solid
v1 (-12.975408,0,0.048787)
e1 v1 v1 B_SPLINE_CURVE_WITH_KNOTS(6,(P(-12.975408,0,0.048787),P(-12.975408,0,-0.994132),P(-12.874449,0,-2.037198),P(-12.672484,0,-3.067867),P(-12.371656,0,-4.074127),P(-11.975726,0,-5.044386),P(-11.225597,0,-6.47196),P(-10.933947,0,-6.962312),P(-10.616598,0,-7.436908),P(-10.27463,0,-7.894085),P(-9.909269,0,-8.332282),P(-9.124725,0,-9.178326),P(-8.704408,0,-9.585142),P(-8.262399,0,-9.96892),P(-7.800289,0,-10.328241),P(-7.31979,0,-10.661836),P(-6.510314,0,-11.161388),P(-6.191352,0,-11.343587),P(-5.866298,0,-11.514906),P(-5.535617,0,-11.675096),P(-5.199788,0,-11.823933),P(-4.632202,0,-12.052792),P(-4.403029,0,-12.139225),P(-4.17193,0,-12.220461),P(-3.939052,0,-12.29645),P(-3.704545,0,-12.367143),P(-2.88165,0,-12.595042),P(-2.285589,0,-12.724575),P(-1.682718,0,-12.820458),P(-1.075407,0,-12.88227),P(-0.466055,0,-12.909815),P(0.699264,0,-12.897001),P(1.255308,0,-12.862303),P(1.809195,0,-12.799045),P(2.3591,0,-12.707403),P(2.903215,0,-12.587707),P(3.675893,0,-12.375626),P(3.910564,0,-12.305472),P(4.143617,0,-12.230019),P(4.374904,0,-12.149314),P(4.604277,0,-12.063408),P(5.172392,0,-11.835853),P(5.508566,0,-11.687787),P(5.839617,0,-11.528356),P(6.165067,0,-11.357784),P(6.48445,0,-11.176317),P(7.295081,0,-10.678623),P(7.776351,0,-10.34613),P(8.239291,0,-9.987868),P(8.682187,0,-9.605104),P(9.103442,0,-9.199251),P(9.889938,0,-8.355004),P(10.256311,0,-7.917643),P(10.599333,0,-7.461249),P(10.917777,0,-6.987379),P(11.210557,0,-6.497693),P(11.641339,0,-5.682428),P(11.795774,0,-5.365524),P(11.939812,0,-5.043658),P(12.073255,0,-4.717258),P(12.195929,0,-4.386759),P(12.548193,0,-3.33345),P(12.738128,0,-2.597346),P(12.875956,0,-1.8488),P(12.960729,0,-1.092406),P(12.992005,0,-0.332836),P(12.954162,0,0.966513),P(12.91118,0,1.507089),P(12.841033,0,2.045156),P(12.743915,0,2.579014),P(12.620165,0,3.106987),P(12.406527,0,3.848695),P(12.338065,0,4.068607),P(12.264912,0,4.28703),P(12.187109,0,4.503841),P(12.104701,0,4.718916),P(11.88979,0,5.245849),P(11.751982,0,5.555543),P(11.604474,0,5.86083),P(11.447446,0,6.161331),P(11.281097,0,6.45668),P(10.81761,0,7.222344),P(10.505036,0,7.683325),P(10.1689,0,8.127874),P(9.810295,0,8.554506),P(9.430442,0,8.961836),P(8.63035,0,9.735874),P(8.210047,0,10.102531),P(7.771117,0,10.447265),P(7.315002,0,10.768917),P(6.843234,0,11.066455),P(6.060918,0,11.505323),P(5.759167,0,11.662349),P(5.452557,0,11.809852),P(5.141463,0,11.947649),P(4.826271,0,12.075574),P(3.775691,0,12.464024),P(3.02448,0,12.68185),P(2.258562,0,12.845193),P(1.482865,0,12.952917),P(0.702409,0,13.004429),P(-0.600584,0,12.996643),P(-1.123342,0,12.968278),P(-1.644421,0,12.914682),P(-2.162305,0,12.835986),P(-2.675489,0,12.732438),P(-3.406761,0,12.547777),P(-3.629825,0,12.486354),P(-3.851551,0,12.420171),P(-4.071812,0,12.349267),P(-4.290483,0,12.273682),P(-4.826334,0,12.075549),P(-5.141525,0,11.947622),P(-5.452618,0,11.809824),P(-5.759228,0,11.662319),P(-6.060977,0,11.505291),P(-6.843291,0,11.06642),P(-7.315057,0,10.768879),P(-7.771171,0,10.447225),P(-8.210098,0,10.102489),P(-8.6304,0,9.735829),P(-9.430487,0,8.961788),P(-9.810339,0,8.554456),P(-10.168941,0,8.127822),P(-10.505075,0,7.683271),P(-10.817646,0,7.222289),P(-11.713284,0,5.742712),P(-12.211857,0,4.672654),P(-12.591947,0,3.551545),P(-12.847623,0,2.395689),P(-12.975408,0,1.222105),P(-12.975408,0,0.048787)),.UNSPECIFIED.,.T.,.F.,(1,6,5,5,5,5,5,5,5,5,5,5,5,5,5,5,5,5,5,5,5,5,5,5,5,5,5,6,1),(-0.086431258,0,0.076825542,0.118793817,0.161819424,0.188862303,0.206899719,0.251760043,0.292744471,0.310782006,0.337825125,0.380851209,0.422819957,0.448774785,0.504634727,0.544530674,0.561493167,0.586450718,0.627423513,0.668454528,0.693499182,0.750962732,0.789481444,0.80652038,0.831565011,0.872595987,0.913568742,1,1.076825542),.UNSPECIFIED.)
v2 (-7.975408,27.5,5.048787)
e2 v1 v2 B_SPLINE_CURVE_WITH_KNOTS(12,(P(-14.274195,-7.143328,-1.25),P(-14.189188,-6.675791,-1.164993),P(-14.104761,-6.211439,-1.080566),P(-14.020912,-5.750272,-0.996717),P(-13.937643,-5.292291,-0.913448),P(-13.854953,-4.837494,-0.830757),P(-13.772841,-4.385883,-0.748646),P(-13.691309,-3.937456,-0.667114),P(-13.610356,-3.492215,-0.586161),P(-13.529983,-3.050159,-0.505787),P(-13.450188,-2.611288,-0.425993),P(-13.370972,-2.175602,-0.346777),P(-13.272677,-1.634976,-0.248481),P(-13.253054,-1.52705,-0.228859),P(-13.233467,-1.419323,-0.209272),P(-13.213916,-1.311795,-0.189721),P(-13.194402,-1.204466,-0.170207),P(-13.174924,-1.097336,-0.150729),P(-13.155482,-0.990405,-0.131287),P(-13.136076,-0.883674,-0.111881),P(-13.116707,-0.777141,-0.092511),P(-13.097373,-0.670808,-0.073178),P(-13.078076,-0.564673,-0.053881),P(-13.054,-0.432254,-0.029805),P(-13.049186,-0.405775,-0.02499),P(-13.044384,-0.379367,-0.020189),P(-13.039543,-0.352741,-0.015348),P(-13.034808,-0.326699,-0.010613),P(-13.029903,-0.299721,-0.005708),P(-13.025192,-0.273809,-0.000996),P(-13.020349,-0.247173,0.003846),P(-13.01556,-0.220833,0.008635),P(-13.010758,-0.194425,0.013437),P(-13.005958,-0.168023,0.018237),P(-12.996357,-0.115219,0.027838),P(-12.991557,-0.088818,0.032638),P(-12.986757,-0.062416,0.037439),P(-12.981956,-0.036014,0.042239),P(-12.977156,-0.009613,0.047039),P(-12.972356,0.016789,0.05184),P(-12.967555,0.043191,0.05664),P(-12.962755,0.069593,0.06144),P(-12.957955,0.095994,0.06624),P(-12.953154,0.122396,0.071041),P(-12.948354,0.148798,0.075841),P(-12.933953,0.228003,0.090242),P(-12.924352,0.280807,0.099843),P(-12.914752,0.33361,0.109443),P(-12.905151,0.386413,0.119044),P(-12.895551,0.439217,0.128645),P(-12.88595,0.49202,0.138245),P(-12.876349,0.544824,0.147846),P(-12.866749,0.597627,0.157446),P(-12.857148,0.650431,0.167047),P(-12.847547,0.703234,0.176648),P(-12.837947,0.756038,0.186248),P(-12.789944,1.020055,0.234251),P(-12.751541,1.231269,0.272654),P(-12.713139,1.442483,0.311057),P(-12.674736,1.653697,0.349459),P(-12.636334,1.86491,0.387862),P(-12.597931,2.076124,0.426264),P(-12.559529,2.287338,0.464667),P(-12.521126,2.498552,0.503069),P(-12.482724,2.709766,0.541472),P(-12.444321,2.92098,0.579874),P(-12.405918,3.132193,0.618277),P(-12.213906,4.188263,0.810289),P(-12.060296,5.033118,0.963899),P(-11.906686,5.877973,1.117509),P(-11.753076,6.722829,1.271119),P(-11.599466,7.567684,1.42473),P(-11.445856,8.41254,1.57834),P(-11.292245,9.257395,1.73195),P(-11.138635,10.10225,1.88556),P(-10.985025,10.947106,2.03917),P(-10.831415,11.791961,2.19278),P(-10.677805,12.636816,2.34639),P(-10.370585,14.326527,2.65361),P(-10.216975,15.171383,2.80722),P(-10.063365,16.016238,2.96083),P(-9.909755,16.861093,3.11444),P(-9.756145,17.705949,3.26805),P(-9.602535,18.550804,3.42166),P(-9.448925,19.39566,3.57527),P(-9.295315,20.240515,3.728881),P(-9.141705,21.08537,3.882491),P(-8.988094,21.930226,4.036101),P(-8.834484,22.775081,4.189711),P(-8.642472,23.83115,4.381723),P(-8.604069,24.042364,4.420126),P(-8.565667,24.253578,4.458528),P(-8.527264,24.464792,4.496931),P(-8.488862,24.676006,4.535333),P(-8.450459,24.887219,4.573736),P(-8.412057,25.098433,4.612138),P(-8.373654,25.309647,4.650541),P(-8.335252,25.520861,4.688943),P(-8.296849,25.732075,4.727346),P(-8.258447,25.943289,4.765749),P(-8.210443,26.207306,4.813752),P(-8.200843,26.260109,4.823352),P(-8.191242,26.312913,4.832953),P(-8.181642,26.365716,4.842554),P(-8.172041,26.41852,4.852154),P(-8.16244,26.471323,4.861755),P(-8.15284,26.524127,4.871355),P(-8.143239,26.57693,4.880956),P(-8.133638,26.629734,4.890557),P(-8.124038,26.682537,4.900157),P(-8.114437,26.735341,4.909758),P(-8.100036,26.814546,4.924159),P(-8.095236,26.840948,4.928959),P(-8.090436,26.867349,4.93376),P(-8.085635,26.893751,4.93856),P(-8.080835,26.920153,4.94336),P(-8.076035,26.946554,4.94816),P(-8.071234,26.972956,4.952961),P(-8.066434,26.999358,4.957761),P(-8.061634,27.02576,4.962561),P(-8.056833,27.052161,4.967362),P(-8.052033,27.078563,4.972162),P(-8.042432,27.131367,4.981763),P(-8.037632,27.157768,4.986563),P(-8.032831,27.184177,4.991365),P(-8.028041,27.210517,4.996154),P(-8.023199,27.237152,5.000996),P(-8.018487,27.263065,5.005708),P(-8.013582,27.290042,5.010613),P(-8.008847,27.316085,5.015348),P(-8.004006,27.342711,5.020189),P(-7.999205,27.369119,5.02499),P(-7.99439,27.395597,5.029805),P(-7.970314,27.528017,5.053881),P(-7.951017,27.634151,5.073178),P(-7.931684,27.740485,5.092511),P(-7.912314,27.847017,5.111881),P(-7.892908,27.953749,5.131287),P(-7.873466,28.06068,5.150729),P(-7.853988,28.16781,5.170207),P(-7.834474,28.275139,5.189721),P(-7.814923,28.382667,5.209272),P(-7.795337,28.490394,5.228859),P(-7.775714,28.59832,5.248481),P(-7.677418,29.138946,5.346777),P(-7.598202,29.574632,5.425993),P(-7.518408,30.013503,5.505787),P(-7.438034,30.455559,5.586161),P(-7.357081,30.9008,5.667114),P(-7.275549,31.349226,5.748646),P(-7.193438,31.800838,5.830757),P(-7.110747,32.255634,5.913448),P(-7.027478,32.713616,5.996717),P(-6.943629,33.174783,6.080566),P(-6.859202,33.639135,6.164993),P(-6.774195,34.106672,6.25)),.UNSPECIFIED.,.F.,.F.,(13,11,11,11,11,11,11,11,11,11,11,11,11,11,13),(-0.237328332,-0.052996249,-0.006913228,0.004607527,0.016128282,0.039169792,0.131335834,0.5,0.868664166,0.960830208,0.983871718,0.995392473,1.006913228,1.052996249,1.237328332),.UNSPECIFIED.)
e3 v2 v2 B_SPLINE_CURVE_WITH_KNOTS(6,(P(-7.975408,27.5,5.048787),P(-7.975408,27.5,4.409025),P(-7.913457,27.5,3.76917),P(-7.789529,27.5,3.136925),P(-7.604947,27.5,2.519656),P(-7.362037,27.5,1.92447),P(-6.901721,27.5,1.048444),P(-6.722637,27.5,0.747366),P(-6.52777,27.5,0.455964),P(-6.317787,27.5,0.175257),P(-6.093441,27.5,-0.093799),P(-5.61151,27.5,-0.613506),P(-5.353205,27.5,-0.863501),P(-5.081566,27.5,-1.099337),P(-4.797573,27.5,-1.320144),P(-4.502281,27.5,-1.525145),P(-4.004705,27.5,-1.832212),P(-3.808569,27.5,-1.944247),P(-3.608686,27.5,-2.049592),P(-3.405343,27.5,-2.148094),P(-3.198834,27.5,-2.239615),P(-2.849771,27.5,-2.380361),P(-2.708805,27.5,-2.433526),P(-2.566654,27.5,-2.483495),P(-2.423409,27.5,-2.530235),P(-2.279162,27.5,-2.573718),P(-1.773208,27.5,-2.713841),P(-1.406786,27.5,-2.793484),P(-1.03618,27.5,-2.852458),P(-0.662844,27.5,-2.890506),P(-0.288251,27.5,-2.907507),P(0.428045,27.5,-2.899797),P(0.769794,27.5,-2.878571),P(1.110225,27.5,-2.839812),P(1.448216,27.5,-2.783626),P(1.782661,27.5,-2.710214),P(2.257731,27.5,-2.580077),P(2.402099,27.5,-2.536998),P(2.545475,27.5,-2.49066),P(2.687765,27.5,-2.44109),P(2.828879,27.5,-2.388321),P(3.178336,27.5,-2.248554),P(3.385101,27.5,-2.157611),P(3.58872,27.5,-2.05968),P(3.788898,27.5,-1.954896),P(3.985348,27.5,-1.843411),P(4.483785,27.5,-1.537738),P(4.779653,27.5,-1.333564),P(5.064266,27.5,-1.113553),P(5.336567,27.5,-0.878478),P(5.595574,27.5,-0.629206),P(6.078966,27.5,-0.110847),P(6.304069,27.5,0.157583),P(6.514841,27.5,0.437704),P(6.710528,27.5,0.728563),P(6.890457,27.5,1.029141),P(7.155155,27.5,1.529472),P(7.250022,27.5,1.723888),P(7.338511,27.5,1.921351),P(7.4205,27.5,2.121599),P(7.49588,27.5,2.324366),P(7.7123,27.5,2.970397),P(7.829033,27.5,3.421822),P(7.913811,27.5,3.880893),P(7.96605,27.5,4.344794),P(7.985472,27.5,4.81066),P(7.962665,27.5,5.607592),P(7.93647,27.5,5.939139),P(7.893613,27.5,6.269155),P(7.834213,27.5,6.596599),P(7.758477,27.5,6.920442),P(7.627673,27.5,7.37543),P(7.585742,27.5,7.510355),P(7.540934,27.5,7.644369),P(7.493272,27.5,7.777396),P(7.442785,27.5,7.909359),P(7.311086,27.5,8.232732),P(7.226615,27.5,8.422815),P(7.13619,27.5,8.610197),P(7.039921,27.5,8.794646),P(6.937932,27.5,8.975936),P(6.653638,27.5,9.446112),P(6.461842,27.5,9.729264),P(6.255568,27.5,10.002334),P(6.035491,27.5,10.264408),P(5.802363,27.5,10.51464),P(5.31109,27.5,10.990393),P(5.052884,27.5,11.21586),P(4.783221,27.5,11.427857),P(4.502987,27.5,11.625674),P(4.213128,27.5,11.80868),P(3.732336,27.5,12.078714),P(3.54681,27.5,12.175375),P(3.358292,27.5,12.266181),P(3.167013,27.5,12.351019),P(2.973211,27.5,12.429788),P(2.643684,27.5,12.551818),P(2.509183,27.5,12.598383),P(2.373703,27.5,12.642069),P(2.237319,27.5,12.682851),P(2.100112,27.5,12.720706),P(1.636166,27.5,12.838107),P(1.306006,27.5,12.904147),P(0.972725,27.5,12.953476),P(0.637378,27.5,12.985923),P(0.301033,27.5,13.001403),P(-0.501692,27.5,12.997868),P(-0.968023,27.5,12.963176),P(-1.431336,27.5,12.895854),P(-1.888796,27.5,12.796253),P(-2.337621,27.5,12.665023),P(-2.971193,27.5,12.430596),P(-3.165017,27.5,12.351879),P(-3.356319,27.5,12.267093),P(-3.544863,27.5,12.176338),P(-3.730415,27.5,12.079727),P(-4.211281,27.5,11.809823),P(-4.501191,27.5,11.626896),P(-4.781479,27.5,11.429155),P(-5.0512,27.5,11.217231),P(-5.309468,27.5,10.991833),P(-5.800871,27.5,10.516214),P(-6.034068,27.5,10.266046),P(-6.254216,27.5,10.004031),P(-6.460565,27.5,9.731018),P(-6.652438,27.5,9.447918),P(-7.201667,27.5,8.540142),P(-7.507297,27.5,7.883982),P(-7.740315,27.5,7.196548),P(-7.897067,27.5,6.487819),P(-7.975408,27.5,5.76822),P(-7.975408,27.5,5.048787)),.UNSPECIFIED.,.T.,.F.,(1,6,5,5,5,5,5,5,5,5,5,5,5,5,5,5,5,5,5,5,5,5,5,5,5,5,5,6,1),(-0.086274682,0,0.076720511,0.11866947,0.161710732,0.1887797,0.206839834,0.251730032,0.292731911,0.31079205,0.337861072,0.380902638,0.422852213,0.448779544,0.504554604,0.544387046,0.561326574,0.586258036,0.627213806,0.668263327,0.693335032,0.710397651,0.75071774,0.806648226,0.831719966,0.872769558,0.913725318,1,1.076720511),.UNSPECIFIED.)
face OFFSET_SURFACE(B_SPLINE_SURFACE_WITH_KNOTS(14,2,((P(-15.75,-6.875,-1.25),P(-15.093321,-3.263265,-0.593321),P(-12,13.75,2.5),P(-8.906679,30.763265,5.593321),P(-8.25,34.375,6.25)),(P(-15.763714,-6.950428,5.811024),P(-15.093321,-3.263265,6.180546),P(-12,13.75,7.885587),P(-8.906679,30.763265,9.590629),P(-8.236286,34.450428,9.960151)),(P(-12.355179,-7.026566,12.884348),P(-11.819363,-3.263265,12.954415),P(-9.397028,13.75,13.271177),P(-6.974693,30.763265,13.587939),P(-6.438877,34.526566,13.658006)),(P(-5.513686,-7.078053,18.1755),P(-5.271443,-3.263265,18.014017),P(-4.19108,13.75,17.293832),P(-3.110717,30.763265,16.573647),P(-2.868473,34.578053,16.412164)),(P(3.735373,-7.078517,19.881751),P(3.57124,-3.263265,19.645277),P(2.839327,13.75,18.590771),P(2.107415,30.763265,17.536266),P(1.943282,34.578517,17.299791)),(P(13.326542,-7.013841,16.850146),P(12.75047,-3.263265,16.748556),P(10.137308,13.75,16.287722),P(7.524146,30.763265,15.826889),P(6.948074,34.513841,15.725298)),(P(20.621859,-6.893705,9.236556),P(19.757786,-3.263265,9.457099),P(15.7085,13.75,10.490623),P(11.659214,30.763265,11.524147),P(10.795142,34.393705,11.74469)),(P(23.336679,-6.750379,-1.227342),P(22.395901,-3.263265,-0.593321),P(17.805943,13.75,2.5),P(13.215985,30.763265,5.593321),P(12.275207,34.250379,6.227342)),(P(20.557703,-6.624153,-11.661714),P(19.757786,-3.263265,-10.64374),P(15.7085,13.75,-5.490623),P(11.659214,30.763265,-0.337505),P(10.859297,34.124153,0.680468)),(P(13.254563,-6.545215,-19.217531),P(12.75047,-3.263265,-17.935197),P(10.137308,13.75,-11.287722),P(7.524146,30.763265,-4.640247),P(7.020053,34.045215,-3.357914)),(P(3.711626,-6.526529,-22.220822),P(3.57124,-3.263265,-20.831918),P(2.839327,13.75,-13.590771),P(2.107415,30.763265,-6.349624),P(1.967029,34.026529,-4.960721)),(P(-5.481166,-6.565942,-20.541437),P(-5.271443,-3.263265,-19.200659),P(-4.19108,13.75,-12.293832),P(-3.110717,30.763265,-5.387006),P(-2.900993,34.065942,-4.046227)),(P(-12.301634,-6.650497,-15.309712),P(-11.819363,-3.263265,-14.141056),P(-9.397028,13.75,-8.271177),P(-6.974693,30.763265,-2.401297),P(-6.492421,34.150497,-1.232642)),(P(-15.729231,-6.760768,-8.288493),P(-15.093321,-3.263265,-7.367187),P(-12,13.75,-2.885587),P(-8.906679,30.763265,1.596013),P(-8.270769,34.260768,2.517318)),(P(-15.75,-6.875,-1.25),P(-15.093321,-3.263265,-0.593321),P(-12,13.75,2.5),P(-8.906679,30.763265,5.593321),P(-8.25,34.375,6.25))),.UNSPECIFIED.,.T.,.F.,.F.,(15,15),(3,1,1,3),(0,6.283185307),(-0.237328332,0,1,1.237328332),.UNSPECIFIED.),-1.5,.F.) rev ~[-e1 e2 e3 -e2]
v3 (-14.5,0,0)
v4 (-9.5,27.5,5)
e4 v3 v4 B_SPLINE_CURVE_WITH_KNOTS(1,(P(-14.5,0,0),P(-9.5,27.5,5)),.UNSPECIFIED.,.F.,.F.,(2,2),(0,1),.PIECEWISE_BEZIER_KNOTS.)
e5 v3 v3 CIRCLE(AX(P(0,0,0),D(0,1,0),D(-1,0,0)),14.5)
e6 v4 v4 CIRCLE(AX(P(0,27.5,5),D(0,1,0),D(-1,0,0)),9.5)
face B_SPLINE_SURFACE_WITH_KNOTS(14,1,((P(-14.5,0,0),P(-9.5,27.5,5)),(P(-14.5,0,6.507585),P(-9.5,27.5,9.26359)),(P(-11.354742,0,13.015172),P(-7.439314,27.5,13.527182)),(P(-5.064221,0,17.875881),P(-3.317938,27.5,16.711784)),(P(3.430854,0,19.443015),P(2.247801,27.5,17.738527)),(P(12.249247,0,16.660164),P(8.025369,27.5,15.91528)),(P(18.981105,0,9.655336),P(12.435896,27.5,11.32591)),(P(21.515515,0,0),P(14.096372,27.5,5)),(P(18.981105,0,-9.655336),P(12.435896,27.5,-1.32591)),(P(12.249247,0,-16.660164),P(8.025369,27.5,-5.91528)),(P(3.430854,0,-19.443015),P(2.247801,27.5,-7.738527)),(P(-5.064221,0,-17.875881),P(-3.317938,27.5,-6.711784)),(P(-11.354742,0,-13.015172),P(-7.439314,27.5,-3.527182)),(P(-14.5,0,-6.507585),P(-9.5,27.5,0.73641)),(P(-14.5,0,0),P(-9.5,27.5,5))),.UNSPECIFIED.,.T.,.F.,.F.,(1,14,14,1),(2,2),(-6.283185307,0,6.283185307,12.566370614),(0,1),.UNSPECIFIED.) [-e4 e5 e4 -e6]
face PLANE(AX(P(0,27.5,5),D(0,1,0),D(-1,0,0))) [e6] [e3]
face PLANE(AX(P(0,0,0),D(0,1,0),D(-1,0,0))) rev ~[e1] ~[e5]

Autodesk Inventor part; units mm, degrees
ref_plane "YZ Plane" through (0, 0, 0) normal (1, 0, 0) x (0, 1, 0)
ref_plane "XY Plane" through (0, 0, 0) normal (0, 0, 1) x (1, 0, 0)
sketch "Szkic6" plane through (0, 0, 0) normal (0, 1, 0) x (-1, 0, 0)
  circle A0 centre (0, 0) radius 14.5
  dimension "d33" = 29
ref_plane "Płaszczyzna konstrukcyjna1" through (0, 27.5, 0) normal (0, 1, 0) x (-1, 0, 0)
sketch "Szkic7" plane through (0, 27.5, 0) normal (0, 1, 0) x (-1, 0, 0)
  circle A0 centre (0, 5) radius 9.5
  line L0 (0, -20.3) -> (0, 20.3) construction
  circle A1 centre (0, 0) radius 14.5 construction
  dimension "d35" = 19
loft "Wyciągnięcie złożone1" add profiles "Szkic6", "Szkic7"
shell "Skorupa1" thickness 1.5 removed faces 2 at (-2.3703, 27.5, 2.9001) at (1.052, 0, -3.5603)
equation "\"d33\" = OD1"
equation "\"d35\" = OD2"
equation "\"d52\" = THK"
equation "\"SzerokośćGięciaPodcięcia\" = Grubość"
equation "\"RozmiarPodcięciaNarożnika\" = 4 * Grubość"
equation "\"PromieńPrzejścia\" = PromieńGięcia"
equation "\"Rozmiar_promienia_Jacobiego\" = PromieńGięcia"
equation "\"Wielk_odstępu\" = Grubość"
equation "\"d2\" = PromieńGięcia"
equation "\"d23\" = PromieńGięcia"
equation "\"OD1\" = 29"
equation "\"OD2\" = 19"
equation "\"L\" = 27.5"
equation "\"THK\" = 1.5"
equation "\"d34\" = L"
equation "\"Grubość\" = 1.5"
equation "\"PromieńGięcia\" = 3"
properties part number "Redukcja asymetryczna Ø29x19x1,5 L=27,5" material "304"
